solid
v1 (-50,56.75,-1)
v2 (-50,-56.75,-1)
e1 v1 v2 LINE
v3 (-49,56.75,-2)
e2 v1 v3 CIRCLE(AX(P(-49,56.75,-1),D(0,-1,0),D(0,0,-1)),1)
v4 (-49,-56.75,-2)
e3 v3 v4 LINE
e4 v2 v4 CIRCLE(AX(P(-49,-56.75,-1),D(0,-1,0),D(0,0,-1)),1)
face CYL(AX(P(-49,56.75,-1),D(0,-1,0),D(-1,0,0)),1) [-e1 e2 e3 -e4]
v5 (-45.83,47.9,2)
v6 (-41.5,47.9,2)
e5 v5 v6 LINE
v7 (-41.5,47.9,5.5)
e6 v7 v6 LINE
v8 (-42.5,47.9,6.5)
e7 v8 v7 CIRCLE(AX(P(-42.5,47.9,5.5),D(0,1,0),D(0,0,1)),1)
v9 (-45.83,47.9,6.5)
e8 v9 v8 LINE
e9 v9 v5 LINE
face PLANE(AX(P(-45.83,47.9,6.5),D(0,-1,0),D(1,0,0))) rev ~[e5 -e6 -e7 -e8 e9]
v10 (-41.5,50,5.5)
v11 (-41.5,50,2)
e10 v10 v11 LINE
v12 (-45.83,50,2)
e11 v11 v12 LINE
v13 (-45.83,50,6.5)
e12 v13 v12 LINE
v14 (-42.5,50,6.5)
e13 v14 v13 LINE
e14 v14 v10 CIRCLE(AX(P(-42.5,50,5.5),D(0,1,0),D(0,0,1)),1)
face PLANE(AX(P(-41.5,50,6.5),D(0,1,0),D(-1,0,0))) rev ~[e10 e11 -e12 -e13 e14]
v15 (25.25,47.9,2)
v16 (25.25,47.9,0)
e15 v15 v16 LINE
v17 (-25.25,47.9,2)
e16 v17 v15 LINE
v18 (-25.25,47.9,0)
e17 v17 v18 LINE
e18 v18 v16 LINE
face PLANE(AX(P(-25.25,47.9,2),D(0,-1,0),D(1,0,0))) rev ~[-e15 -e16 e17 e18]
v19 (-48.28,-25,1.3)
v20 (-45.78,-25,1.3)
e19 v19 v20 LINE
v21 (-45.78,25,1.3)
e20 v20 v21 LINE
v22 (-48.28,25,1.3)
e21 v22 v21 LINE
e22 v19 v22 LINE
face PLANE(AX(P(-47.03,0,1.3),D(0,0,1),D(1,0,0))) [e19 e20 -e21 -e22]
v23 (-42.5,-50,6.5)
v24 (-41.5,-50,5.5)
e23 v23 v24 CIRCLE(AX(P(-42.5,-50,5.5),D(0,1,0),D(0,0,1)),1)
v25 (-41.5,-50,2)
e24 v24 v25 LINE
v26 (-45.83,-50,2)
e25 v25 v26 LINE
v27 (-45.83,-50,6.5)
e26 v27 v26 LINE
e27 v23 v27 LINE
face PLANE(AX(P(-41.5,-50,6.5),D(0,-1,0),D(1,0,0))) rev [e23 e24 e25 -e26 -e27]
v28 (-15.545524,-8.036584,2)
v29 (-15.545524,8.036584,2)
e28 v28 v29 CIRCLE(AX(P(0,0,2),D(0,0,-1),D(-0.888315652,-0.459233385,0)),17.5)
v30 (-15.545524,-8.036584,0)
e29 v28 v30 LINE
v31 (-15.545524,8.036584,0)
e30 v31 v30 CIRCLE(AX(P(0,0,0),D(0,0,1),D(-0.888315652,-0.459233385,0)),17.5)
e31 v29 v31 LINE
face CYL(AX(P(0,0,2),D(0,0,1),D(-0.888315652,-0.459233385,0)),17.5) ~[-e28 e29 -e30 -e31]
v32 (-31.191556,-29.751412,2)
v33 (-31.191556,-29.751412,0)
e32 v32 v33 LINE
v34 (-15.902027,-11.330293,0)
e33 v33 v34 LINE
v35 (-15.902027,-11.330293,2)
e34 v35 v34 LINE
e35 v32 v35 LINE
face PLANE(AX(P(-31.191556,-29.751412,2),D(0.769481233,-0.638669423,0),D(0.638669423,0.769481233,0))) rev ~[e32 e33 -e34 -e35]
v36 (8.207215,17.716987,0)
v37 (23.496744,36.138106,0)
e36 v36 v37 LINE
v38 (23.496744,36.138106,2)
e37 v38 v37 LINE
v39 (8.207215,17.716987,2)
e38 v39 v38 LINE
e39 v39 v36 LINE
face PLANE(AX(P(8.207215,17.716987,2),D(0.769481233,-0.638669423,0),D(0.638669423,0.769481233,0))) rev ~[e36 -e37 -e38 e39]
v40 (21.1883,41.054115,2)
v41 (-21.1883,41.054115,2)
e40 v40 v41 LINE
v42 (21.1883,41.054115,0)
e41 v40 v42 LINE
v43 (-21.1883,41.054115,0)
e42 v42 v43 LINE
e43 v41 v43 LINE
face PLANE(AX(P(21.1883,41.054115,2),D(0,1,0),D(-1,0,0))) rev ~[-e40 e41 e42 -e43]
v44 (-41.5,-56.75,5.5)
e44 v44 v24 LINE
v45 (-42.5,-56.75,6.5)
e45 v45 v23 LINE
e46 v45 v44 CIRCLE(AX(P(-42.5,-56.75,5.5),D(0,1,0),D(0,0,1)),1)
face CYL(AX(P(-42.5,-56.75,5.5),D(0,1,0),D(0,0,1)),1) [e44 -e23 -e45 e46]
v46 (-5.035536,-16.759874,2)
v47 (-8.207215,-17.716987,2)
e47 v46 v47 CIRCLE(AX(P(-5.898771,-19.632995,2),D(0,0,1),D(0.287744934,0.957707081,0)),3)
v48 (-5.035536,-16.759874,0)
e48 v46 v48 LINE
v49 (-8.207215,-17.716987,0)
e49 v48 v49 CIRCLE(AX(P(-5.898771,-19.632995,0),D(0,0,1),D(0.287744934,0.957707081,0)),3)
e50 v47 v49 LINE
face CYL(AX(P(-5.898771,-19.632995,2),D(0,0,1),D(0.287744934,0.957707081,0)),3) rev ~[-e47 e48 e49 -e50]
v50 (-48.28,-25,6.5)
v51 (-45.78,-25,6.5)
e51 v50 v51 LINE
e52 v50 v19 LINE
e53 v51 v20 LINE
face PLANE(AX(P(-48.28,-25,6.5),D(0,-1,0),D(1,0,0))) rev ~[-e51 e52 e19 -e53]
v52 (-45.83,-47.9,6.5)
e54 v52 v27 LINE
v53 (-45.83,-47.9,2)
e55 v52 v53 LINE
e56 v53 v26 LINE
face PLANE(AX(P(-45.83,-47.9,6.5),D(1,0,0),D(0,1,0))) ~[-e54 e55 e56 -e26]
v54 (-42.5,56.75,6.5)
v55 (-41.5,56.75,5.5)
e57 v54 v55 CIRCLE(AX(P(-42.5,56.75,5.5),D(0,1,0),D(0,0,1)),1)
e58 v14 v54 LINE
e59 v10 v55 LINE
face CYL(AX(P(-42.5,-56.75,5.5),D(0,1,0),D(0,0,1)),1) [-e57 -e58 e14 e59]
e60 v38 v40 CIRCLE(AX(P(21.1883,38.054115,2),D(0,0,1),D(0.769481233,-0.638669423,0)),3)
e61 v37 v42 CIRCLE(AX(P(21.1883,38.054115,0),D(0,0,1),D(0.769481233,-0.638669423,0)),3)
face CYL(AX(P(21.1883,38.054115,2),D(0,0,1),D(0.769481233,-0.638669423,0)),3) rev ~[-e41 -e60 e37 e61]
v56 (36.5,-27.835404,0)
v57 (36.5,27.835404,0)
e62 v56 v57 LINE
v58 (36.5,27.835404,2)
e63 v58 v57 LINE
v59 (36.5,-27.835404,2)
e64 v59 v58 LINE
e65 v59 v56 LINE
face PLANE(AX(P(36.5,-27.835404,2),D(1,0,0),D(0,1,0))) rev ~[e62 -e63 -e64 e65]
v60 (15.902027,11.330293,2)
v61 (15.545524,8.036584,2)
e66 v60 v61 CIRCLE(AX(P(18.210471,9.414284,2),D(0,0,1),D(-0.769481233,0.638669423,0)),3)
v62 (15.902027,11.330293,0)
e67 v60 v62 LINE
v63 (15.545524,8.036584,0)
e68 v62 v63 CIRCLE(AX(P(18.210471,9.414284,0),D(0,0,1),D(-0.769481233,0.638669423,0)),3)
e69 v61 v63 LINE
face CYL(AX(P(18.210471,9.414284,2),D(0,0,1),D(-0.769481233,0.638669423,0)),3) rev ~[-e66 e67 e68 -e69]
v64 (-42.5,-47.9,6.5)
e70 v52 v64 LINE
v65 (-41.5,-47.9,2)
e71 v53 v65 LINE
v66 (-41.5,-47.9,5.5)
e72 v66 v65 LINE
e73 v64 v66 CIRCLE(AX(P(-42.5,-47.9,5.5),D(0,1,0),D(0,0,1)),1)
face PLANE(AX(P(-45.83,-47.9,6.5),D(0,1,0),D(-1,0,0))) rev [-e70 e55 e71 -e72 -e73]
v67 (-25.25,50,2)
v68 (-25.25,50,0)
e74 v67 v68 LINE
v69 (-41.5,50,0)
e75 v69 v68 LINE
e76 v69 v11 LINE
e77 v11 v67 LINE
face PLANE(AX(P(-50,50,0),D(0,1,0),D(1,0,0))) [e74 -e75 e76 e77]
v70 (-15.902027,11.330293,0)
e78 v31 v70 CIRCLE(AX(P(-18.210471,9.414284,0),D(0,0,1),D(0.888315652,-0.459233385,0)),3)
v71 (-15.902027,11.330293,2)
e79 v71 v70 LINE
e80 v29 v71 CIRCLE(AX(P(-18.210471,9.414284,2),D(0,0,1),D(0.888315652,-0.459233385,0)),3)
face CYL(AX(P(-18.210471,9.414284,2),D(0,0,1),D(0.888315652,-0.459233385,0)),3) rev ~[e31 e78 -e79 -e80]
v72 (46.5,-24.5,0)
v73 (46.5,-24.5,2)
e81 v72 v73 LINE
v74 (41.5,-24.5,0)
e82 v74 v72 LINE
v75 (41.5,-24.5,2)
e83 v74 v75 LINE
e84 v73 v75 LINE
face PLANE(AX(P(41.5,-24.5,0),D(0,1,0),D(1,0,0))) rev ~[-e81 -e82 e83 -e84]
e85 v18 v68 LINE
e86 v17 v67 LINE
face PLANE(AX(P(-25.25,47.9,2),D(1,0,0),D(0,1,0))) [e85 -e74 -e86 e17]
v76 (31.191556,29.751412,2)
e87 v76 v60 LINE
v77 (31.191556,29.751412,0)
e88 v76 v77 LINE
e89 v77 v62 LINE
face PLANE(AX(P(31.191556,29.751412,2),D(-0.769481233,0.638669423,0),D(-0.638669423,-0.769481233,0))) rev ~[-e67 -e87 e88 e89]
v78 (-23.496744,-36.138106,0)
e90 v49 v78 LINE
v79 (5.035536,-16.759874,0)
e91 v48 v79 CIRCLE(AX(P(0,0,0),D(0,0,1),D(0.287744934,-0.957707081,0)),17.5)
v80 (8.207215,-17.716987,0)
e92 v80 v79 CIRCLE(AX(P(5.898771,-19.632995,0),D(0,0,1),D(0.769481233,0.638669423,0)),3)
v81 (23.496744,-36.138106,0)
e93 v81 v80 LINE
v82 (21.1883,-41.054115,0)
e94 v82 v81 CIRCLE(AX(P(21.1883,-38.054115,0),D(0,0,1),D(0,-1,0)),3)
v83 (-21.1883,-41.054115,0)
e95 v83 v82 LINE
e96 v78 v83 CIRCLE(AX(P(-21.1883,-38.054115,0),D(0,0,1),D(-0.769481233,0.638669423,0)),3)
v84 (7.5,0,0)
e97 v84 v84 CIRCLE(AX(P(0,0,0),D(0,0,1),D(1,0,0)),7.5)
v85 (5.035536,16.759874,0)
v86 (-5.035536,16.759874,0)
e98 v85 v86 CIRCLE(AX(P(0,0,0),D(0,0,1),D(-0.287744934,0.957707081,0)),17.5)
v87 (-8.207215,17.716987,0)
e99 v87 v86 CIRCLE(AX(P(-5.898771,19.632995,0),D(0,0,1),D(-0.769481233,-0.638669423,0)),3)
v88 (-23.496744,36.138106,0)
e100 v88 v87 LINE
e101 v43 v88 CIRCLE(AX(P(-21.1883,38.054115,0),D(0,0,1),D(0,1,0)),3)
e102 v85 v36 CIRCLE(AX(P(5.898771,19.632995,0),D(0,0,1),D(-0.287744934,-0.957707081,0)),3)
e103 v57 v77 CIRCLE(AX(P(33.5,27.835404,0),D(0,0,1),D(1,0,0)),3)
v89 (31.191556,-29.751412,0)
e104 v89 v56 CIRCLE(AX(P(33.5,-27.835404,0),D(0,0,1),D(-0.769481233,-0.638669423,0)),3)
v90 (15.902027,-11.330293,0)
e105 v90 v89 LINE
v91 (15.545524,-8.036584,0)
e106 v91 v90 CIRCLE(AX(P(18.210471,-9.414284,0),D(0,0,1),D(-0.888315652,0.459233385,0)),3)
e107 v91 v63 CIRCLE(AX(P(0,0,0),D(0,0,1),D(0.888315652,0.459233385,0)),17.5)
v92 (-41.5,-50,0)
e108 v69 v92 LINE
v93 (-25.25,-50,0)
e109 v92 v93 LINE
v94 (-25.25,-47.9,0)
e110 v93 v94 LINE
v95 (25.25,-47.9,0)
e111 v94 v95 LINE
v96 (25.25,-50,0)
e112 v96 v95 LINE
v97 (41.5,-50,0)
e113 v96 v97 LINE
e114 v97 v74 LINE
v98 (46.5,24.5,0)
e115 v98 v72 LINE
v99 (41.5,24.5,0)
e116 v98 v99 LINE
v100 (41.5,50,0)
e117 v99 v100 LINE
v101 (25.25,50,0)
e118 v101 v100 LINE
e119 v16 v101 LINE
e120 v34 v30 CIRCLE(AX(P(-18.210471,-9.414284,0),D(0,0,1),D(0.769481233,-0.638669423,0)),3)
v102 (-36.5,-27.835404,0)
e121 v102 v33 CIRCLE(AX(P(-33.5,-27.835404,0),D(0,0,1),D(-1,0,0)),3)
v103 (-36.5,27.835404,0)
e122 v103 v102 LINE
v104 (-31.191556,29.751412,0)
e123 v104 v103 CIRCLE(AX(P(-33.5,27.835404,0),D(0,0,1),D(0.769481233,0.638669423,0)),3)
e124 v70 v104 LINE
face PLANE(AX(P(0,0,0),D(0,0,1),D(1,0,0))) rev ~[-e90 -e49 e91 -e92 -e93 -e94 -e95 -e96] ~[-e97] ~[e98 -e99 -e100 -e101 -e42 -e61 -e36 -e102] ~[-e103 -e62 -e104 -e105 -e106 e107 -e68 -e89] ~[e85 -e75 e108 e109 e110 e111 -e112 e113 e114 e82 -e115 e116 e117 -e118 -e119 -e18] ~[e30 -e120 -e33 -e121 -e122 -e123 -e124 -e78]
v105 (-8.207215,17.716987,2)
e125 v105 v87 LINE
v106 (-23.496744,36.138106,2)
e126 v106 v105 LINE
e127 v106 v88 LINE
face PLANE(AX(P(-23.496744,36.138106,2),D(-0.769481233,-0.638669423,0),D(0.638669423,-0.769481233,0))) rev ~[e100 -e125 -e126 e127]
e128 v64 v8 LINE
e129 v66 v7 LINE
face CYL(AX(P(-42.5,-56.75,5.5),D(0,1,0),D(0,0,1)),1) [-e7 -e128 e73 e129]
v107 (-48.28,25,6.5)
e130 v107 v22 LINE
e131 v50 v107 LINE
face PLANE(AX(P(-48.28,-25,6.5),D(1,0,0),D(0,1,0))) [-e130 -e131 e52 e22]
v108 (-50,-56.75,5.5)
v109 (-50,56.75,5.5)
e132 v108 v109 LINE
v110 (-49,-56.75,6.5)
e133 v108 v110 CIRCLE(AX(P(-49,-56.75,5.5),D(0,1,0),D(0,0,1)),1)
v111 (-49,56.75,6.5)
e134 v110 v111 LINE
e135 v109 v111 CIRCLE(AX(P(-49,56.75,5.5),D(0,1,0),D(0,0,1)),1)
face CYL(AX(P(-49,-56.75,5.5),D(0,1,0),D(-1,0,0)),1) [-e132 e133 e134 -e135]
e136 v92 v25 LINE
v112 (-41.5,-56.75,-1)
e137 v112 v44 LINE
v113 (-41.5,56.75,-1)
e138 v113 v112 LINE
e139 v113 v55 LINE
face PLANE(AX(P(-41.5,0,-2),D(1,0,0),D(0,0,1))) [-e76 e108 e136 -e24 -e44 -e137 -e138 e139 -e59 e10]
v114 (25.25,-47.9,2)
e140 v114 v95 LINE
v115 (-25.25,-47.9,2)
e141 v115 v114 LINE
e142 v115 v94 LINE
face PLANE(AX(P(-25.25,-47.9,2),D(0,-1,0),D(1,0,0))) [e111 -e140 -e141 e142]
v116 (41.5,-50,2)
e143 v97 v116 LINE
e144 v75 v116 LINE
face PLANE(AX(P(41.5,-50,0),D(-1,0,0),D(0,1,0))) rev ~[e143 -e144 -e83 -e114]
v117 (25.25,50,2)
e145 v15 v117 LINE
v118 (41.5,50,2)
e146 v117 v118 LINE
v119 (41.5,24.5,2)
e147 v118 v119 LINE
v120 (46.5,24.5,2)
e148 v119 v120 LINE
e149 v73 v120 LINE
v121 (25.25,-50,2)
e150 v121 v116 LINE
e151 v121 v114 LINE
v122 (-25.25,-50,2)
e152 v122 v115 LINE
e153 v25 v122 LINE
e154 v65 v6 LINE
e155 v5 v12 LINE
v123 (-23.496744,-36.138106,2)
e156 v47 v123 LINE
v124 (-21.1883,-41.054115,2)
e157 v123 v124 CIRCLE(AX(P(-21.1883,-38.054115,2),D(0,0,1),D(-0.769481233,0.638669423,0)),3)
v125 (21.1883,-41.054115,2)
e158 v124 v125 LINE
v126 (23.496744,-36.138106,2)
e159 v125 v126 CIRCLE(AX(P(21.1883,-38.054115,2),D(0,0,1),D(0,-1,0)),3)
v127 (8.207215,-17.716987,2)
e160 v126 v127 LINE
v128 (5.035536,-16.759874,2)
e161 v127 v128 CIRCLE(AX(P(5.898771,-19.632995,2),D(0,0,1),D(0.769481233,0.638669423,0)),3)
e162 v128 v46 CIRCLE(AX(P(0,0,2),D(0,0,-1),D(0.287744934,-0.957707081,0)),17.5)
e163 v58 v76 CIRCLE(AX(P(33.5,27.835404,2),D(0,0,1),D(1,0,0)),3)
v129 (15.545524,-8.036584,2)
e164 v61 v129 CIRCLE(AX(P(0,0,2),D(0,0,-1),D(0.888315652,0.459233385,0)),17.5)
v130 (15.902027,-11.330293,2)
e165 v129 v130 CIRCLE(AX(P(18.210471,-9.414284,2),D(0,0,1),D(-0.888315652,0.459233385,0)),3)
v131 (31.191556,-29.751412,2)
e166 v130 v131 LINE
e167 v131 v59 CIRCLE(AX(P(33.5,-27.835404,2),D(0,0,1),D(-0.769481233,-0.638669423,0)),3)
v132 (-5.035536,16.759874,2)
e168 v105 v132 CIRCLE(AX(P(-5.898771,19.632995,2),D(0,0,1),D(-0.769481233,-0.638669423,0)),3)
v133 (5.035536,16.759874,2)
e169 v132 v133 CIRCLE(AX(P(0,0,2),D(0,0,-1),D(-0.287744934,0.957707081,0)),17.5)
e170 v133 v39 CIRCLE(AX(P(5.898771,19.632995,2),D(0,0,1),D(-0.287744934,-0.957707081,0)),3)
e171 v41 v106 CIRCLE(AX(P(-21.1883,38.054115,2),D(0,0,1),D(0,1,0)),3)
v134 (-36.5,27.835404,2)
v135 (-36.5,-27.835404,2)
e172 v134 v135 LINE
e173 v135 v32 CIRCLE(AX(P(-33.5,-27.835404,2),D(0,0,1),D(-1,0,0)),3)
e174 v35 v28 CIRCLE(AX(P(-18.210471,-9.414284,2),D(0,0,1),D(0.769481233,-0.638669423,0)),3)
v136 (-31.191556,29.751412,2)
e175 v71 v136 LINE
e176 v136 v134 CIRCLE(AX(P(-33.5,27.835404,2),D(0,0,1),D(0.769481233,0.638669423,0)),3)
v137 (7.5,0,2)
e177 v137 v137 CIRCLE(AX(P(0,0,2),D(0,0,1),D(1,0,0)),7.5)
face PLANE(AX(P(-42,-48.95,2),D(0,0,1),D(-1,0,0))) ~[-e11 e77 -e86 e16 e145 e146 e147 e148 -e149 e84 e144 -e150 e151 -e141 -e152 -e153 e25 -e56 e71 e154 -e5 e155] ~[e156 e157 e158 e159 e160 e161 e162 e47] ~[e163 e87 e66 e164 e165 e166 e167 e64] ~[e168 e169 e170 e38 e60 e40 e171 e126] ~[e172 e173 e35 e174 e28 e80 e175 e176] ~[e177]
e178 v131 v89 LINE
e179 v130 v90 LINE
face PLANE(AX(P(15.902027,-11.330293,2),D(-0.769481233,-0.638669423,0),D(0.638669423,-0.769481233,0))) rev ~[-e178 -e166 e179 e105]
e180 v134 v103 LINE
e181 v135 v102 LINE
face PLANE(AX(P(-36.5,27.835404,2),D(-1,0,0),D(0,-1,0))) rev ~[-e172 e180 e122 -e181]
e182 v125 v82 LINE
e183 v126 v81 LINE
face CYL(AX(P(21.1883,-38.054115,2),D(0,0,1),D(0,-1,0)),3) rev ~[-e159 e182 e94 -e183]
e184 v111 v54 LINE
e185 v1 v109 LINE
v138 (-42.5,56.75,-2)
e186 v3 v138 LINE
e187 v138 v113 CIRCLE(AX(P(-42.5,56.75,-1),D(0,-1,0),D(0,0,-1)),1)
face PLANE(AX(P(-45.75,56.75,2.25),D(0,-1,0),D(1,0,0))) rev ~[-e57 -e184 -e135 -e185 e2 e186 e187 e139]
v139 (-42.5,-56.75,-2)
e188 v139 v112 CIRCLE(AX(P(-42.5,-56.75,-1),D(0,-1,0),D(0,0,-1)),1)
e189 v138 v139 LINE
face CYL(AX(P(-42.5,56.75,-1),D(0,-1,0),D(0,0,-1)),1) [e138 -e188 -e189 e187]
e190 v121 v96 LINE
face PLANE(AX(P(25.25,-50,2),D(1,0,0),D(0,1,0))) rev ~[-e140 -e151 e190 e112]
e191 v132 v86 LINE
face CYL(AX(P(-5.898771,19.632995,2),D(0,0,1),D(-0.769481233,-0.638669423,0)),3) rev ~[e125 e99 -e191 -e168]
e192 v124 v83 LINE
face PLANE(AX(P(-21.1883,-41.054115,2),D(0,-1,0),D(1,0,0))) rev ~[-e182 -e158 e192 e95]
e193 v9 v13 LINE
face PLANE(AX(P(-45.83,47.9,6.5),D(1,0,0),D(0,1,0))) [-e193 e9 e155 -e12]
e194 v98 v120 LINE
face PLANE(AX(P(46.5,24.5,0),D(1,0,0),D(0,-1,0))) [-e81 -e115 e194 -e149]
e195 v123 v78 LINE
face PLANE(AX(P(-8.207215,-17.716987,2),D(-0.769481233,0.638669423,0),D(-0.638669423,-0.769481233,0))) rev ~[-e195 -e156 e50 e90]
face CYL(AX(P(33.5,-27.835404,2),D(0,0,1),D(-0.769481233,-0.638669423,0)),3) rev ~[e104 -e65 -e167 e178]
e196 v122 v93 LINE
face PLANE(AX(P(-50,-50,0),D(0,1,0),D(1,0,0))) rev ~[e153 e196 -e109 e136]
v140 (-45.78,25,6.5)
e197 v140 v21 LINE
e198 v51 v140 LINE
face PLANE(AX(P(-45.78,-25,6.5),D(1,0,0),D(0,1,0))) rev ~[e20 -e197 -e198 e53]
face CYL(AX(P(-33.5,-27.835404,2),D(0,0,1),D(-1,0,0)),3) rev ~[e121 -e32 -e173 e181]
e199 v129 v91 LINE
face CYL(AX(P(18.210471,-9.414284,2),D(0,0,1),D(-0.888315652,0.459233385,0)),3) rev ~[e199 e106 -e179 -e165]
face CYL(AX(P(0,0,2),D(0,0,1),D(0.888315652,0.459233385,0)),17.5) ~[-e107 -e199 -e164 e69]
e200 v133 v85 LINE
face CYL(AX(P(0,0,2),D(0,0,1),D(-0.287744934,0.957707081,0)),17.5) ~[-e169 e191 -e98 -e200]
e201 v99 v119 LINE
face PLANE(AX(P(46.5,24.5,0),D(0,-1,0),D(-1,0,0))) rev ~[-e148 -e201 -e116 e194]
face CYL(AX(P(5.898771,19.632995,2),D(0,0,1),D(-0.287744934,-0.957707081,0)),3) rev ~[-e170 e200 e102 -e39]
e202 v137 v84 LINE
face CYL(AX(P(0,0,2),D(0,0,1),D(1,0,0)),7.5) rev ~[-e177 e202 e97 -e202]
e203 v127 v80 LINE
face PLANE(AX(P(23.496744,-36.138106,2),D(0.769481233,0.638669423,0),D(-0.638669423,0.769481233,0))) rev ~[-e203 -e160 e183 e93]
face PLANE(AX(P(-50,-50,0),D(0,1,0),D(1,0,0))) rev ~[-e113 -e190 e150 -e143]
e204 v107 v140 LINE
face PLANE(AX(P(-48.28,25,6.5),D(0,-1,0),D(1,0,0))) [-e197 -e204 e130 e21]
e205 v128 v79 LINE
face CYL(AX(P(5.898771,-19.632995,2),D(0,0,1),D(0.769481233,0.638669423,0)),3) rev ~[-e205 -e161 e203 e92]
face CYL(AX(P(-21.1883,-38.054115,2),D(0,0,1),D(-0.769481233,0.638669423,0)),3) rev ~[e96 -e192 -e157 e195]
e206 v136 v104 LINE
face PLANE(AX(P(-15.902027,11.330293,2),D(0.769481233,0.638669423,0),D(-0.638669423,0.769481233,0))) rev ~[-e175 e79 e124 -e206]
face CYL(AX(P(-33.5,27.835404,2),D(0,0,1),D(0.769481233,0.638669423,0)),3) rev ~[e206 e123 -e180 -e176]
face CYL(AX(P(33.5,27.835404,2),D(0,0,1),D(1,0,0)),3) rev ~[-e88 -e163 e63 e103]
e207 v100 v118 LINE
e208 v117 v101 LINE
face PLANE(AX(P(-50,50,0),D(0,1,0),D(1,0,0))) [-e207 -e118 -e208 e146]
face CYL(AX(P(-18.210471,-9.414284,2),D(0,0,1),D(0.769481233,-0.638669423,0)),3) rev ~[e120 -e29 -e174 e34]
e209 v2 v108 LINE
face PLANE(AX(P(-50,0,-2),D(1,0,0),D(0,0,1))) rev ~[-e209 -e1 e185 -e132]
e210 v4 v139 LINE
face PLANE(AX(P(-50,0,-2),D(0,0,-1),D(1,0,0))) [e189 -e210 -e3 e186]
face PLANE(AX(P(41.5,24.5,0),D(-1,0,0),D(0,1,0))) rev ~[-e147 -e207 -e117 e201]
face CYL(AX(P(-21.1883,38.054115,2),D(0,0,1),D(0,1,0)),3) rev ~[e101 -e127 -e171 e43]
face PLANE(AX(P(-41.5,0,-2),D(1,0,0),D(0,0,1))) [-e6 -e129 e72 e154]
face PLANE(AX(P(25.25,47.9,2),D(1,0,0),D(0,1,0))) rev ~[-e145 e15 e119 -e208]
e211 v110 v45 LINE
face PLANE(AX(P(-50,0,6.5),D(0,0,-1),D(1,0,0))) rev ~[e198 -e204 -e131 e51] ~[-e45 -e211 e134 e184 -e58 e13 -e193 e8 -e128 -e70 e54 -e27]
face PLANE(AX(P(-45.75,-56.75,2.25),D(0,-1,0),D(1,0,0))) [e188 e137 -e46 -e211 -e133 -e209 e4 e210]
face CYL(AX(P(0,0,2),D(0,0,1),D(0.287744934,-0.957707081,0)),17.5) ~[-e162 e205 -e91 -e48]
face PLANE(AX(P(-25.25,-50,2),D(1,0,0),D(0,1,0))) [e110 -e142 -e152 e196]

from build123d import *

# Parameters (mm, degrees)
F0_W      = 100
F0_H      = 100
F1_DEPTH  = 2
F2_R      = 7.5
F2_W      = 50.5
F2_H      = 2.1
F3_DEPTH  = 25
F4_W      = 8.5
F4_H      = 100
F4_W_2    = 3.5
F4_H_2    = 49
F5_DEPTH  = 25
F6_W      = 8.5
F6_H      = 8.5
F7_DEPTH  = 56.75
F8_W      = 2.5
F8_H      = 50
F9_DEPTH  = 5.2
F10_R     = 1
F11_W     = 1
F11_H     = 2.1
F11_W_2   = 3.33
F12_DEPTH = 4.5


# Not quite as in the source:
# - a pattern or mirror of a feature is missing from the dataset's text; its kind, count and spacing are read off the source's solid


with BuildPart() as f1:
    # F0 (on Top) → F1 (new body)
    with BuildSketch(Plane.XY):
        Rectangle(F0_W, F0_H)
    extrude(amount=F1_DEPTH)

    # F2 (on face) → F3 (cut)
    with BuildSketch(Plane.XY.offset(2)):
        with BuildLine():
            ThreePointArc((-21.1883002739, 41.0541145875), (-23.9038135596, 39.3292567737), (-23.4967439726, 36.1381063176))
            Line((-23.4967439726, 36.1381063176), (-8.2072148474, 17.7169868897))
            ThreePointArc((-8.2072148474, 17.7169868897), (-6.7654738079, 16.7609181236), (-5.0355363465, 16.7598739167))
            ThreePointArc((-5.0355363465, 16.7598739167), (0, 17.5), (5.0355363465, 16.7598739167))
            ThreePointArc((5.0355363465, 16.7598739167), (6.7654738079, 16.7609181236), (8.2072148474, 17.7169868897))
            Line((8.2072148474, 17.7169868897), (23.4967439726, 36.1381063176))
            ThreePointArc((23.4967439726, 36.1381063176), (23.9038135596, 39.3292567737), (21.1883002739, 41.0541145875))
            Line((21.1883002739, 41.0541145875), (-21.1883002739, 41.0541145875))
        make_face()
        with BuildLine():
            ThreePointArc((-15.5455239175, -8.0365842327), (-17.5, 0), (-15.5455239175, 8.0365842327))
            ThreePointArc((-15.5455239175, 8.0365842327), (-15.2278910436, 9.7371118179), (-15.9020271762, 11.3302926568))
            Line((-15.9020271762, 11.3302926568), (-31.1915563014, 29.7514120847))
            ThreePointArc((-31.1915563014, 29.7514120847), (-34.5184961718, 30.6572233604), (-36.5, 27.8354038148))
            Line((-36.5, 27.8354038148), (-36.5, -27.8354038148))
            ThreePointArc((-36.5, -27.8354038148), (-34.5184961718, -30.6572233604), (-31.1915563014, -29.7514120847))
            Line((-31.1915563014, -29.7514120847), (-15.9020271762, -11.3302926568))
            ThreePointArc((-15.9020271762, -11.3302926568), (-15.2278910436, -9.7371118179), (-15.5455239175, -8.0365842327))
        make_face()
        Circle(F2_R)
        with BuildLine():
            Line((15.9020271762, -11.3302926568), (31.1915563014, -29.7514120847))
            ThreePointArc((31.1915563014, -29.7514120847), (34.5184961718, -30.6572233604), (36.5, -27.8354038148))
            Line((36.5, -27.8354038148), (36.5, 27.8354038148))
            ThreePointArc((36.5, 27.8354038148), (34.5184961718, 30.6572233604), (31.1915563014, 29.7514120847))
            Line((31.1915563014, 29.7514120847), (15.9020271762, 11.3302926568))
            ThreePointArc((15.9020271762, 11.3302926568), (15.2278910436, 9.7371118179), (15.5455239175, 8.0365842327))
            ThreePointArc((15.5455239175, 8.0365842327), (17.5, 0), (15.5455239175, -8.0365842327))
            ThreePointArc((15.5455239175, -8.0365842327), (15.2278910436, -9.7371118179), (15.9020271762, -11.3302926568))
        make_face()
        with BuildLine():
            ThreePointArc((21.1883002739, -41.0541145875), (23.9038135596, -39.3292567737), (23.4967439726, -36.1381063176))
            Line((23.4967439726, -36.1381063176), (8.2072148474, -17.7169868897))
            ThreePointArc((8.2072148474, -17.7169868897), (6.7654738079, -16.7609181236), (5.0355363465, -16.7598739167))
            ThreePointArc((5.0355363465, -16.7598739167), (0, -17.5), (-5.0355363465, -16.7598739167))
            ThreePointArc((-5.0355363465, -16.7598739167), (-6.7654738079, -16.7609181236), (-8.2072148474, -17.7169868897))
            Line((-8.2072148474, -17.7169868897), (-23.4967439726, -36.1381063176))
            ThreePointArc((-23.4967439726, -36.1381063176), (-23.9038135596, -39.3292567737), (-21.1883002739, -41.0541145875))
            Line((-21.1883002739, -41.0541145875), (21.1883002739, -41.0541145875))
        make_face()
        with Locations((0, 48.95)):
            Rectangle(F2_W, F2_H)
        with Locations((0, -48.95)):
            Rectangle(F2_W, F2_H)
    extrude(amount=-F3_DEPTH, mode=Mode.SUBTRACT)

    # F4 (on face) → F5 (cut)
    with BuildSketch(Plane(origin=(0, 0, 0), x_dir=(1, 0, 0), z_dir=(0, 0, -1))):
        with Locations((-45.75, 0)):
            Rectangle(F4_W, F4_H)
        Polygon((50, 50), (41.5, 50), (41.5, 24.5), (46.5, 24.5), (50, 24.5), align=None)
        with Locations((48.25, 0)):
            Rectangle(F4_W_2, F4_H_2)
        Polygon((41.5, -24.5), (41.5, -50), (50, -50), (50, -24.5), (46.5, -24.5), align=None)
    extrude(amount=-F5_DEPTH, mode=Mode.SUBTRACT)

    # F6 (on Front) → F7 (join, symmetric)
    with BuildSketch(Plane.XZ):
        with Locations((-45.75, 2.25)):
            Rectangle(F6_W, F6_H)
    extrude(amount=F7_DEPTH, both=True)

    # F8 (on face) → F9 (cut)
    with BuildSketch(Plane.XY.offset(6.5)):
        with Locations((-47.03, 0)):
            Rectangle(F8_W, F8_H)
    extrude(amount=-F9_DEPTH, mode=Mode.SUBTRACT)

    # F10
    f10_edges = [f1.edges().sort_by_distance(p)[0] for p in [
        (-41.5, 0, -2),
        (-41.5, 0, 6.5),
        (-50, 0, -2),
        (-50, 0, 6.5),
    ]]
    fillet(f10_edges, radius=F10_R)

    # F11 (on face) → F12 (cut, through all)
    with BuildSketch(Plane.XY.offset(6.5)):
        with Locations((-42, 48.95)):
            Rectangle(F11_W, F11_H)
        with Locations((-44.165, 48.95)):
            Rectangle(F11_W_2, F11_H)
    f12 = extrude(amount=-F12_DEPTH, mode=Mode.SUBTRACT)

    # F12_copies: F12 across plane
    add(f12.mirror(Plane(origin=(0, 0, 0), x_dir=(0, 0, -1), z_dir=(0, -1, 0))), mode=Mode.SUBTRACT)


solid = f1.part
